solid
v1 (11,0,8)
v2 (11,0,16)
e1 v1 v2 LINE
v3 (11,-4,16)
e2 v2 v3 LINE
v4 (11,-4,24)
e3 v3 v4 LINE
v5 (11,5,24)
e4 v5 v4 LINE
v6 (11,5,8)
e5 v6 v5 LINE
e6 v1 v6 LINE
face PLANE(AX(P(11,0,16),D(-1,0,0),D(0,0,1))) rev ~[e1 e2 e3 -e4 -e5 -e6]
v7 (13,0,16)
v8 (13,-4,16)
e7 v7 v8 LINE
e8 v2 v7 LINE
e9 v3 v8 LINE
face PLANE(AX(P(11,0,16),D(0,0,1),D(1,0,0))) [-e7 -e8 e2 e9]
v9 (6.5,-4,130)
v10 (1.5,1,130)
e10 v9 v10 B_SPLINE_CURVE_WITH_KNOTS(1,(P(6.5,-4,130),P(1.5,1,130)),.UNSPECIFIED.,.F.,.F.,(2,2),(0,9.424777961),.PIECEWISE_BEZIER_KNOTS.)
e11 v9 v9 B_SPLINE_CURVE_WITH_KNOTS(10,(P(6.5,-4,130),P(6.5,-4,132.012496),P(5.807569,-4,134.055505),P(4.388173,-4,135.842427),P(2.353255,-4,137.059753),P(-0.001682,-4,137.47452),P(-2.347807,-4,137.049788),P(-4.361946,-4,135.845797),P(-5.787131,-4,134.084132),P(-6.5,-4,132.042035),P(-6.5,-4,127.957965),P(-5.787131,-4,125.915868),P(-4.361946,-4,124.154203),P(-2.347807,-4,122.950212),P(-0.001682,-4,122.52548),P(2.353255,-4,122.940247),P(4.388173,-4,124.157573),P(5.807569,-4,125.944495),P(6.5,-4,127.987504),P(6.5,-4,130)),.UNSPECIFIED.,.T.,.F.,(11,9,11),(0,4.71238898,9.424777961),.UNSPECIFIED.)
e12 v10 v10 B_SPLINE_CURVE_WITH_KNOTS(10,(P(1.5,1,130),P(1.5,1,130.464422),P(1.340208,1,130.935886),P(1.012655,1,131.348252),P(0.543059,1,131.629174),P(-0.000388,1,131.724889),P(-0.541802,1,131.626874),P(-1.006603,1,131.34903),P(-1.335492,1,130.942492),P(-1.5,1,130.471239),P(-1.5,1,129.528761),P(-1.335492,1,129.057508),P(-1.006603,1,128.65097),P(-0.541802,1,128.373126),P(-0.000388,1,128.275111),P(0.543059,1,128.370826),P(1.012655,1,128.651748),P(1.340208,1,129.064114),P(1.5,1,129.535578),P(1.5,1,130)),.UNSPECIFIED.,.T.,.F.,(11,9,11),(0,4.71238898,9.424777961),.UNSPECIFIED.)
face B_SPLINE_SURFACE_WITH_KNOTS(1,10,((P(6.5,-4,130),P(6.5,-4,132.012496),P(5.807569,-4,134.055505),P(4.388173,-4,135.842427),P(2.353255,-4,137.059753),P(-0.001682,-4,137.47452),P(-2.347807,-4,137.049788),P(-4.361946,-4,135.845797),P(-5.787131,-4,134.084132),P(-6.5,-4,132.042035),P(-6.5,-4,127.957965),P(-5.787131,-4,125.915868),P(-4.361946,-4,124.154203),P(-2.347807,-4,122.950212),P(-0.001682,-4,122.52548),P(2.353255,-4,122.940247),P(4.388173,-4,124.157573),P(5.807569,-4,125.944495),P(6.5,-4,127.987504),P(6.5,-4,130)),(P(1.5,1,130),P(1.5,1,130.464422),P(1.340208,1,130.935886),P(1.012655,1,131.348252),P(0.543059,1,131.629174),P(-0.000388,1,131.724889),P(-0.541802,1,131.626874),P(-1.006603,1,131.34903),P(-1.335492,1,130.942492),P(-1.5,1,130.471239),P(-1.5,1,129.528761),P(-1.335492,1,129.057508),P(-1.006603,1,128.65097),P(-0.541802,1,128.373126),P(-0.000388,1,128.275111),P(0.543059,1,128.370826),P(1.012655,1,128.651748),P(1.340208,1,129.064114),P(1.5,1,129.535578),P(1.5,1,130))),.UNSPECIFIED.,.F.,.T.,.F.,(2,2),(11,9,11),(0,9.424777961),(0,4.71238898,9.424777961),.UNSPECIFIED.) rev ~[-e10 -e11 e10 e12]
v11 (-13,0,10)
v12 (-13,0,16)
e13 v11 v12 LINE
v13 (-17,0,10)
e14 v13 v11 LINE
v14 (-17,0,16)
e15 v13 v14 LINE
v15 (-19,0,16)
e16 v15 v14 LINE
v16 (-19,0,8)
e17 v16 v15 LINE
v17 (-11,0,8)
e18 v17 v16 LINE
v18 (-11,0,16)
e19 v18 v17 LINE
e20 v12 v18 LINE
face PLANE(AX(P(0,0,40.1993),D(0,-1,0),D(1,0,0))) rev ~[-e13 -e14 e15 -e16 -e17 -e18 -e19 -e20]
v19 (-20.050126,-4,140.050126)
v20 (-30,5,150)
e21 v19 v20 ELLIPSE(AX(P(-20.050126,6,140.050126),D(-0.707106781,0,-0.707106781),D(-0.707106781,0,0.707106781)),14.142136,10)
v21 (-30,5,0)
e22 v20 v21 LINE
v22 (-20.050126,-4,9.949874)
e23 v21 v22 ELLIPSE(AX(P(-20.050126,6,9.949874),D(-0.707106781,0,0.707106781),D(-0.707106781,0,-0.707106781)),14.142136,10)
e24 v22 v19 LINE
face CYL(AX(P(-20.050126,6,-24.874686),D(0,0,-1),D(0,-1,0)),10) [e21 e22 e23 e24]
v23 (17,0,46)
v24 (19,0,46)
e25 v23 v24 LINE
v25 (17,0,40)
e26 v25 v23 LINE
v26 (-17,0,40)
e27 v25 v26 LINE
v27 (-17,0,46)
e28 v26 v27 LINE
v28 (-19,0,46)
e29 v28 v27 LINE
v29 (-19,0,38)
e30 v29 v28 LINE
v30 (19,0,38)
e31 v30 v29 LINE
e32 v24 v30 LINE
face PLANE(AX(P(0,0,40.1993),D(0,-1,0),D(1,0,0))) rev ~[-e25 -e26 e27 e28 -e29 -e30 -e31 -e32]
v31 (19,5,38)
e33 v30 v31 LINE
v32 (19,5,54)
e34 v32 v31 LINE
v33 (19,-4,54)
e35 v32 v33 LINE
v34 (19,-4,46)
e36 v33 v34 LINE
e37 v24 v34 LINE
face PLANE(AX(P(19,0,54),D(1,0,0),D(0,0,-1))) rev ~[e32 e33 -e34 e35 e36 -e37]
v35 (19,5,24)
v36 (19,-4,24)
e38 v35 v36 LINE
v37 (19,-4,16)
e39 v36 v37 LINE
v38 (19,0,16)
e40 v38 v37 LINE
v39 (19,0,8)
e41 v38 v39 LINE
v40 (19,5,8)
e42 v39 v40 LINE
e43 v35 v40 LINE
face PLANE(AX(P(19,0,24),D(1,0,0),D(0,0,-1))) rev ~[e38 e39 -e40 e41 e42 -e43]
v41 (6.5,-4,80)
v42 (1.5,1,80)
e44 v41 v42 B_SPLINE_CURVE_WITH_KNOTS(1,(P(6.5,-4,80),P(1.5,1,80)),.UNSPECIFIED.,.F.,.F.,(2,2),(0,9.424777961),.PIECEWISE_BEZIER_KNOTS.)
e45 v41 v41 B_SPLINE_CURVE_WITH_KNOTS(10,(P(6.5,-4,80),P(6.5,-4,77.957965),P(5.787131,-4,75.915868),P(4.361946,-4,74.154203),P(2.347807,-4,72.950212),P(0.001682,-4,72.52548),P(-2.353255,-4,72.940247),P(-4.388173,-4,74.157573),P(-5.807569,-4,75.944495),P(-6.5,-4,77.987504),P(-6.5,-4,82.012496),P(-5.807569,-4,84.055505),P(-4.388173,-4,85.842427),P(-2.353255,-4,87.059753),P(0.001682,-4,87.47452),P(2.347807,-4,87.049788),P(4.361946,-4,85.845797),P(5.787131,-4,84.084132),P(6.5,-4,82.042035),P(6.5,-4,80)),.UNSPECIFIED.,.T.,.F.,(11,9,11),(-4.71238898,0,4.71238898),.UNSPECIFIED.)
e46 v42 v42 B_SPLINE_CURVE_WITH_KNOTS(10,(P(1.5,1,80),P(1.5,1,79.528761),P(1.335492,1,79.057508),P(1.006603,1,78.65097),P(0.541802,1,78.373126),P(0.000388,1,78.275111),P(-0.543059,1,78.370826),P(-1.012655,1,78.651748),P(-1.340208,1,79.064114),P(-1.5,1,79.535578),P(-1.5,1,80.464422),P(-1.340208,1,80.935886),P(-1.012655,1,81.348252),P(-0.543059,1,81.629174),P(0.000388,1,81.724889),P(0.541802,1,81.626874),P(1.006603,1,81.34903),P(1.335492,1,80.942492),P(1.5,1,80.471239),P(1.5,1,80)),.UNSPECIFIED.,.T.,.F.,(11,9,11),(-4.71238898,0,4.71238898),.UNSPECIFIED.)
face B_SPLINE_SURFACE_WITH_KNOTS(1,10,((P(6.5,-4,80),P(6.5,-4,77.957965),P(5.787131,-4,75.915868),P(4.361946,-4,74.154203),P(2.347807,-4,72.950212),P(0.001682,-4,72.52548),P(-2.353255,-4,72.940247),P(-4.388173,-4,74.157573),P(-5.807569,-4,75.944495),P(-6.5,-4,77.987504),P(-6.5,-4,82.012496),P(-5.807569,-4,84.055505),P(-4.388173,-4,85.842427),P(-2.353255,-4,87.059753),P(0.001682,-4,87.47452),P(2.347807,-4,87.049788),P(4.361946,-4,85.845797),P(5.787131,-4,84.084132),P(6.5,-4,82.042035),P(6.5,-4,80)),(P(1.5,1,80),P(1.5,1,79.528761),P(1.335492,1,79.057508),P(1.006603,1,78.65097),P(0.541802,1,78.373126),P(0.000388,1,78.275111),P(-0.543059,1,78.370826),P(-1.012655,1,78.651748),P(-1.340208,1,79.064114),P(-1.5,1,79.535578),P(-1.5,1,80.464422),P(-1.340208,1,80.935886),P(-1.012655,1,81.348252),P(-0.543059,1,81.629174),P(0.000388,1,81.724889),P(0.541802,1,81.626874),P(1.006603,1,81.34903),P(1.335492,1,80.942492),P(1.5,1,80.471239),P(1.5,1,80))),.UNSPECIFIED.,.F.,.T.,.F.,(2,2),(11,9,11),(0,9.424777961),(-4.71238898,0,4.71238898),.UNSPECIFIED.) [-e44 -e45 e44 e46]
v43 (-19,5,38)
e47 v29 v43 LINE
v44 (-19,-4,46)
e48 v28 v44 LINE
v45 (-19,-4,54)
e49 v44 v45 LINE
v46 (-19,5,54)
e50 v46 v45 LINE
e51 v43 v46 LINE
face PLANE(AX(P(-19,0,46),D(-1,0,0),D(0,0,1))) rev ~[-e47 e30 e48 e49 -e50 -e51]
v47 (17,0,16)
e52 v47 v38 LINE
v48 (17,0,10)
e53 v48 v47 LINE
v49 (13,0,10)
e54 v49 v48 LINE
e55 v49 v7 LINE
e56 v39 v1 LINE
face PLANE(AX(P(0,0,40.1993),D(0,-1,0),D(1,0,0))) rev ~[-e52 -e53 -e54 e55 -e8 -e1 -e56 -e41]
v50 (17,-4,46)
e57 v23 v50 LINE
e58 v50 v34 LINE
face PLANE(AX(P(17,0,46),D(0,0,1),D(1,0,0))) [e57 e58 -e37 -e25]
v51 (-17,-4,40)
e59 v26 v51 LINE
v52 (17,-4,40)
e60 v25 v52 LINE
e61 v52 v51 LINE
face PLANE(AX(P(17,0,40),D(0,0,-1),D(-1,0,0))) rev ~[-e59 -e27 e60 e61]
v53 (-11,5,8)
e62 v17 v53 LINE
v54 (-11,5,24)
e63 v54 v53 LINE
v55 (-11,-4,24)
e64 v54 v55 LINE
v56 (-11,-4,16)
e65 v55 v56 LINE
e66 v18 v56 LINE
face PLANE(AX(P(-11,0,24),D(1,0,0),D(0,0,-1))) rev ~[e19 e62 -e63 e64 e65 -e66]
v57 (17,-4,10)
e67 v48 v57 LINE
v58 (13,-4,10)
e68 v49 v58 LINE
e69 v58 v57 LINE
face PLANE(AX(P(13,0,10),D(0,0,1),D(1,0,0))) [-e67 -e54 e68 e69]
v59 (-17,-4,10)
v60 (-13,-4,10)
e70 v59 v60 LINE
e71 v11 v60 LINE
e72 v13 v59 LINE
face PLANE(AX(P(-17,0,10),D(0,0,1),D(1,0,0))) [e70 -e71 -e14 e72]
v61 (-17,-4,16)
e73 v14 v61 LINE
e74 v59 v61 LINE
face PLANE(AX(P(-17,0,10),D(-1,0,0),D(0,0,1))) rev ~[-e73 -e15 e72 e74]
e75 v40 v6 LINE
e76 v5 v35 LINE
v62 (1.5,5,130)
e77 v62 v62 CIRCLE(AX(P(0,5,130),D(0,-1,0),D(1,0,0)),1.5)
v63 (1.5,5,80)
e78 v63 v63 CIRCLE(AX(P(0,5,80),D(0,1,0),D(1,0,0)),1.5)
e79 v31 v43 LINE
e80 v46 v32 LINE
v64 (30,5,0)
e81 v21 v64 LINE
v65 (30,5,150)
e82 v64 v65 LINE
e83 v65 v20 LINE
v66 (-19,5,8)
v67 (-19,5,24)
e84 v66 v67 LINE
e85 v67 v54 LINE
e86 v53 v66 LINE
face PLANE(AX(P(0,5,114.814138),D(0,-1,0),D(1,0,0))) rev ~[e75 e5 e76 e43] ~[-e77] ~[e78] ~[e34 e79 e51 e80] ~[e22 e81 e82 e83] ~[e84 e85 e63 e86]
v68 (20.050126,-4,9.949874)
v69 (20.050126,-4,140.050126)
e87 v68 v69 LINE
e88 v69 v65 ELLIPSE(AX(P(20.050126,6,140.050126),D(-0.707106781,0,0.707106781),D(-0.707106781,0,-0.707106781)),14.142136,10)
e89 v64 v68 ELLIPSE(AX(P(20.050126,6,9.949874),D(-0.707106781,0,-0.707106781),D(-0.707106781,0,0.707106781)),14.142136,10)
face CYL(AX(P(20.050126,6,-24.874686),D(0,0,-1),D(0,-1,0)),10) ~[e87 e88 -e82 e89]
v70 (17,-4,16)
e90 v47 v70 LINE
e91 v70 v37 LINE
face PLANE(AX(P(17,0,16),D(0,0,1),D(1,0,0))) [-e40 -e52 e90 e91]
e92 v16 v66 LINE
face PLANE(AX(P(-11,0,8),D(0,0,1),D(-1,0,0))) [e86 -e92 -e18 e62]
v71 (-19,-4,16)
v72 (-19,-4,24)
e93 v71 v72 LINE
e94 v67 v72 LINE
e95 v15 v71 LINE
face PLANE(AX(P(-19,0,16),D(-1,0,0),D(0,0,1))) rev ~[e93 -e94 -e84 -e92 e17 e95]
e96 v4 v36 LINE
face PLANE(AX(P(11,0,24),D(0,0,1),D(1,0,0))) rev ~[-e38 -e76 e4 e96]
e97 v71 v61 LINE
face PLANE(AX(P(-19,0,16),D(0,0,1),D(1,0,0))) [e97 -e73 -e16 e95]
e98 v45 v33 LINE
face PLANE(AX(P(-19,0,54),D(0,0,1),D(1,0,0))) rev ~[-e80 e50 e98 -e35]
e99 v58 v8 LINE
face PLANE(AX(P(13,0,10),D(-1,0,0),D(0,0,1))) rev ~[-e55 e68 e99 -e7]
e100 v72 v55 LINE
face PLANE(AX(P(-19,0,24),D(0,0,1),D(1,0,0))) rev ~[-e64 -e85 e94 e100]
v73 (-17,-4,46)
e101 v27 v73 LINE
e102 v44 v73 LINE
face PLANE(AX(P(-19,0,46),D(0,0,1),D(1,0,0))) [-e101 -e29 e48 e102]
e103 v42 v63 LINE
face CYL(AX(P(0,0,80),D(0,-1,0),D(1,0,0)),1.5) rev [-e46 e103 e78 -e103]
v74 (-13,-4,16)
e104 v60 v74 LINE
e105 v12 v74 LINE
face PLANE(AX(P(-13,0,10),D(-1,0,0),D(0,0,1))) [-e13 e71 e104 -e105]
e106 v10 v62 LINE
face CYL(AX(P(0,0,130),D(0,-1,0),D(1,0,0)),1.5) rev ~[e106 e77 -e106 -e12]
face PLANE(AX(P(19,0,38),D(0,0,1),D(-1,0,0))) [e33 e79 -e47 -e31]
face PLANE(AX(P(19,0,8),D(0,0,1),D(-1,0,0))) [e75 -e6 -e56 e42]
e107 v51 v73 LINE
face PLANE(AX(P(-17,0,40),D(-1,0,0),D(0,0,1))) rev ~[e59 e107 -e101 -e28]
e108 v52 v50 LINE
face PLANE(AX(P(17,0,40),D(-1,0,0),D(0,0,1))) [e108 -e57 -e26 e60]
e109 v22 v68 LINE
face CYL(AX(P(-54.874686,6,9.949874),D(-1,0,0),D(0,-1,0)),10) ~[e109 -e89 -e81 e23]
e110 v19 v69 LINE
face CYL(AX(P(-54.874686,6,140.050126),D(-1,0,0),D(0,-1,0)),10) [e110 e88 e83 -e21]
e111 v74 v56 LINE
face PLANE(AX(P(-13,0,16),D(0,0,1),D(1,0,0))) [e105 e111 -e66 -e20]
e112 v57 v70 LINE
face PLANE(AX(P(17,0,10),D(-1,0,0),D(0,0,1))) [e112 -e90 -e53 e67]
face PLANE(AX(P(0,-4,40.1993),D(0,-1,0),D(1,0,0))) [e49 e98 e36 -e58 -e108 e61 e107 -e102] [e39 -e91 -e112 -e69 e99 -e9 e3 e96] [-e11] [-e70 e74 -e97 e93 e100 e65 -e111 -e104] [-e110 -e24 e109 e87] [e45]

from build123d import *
from build123d import SkipClean  # not in build123d's __all__

# Parameters (mm, degrees)
F0_R        = 1.5
F1_DEPTH    = 5
F0_W        = 22
F0_H        = 2
F0_W_2      = 2
F0_H_2      = 6
F0_W_3      = 4
F2_DEPTH    = 4
F3_SIZE     = 5
F4_T1_DEPTH = 109.7493718553
F4_T3_DEPTH = 199.7493718553


# Not quite as in the source:
# - a fillet or chamfer that OpenCascade refuses, or shapes differently, is made with other operations: its cross-section is extruded or revolved along the edge and cut away or added
# - a feature names something its author has since deleted; it is built from what else it names


with BuildPart() as f1:
    # F0 (on Front) → F1 (new body)
    with BuildSketch(Plane.XZ):
        with BuildLine():
            Line((-30, 150), (-30, 80))
            Line((-30, 80), (-1.5, 80))
            ThreePointArc((-1.5, 80), (0, 81.5), (1.5, 80))
            Line((1.5, 80), (30, 80))
            Line((30, 80), (30, 150))
            Line((30, 150), (-30, 150))
        make_face()
        with Locations((0, 130)):
            Circle(F0_R, mode=Mode.SUBTRACT)
        with BuildLine():
            Line((-30, 0), (0, 0))
            Line((0, 0), (30, 0))
            Line((30, 0), (30, 80))
            Line((30, 80), (1.5, 80))
            ThreePointArc((1.5, 80), (0, 78.5), (-1.5, 80))
            Line((-1.5, 80), (-30, 80))
            Line((-30, 80), (-30, 0))
        make_face()
        Polygon((-11, 24), (-11, 16), (-11, 10), (-11, 8), (-13, 8), (-17, 8), (-19, 8), (-19, 10), (-19, 16), (-19, 24), align=None, mode=Mode.SUBTRACT)
        Polygon((19, 24), (19, 16), (19, 10), (19, 8), (17, 8), (13, 8), (11, 8), (11, 10), (11, 16), (11, 24), align=None, mode=Mode.SUBTRACT)
        Polygon((-19, 54), (-11, 54), (11, 54), (19, 54), (19, 46), (19, 40), (19, 38), (17, 38), (13, 38), (11, 38), (-11, 38), (-13, 38), (-17, 38), (-19, 38), (-19, 40), (-19, 46), (-19, 48), align=None, mode=Mode.SUBTRACT)
    extrude(amount=-F1_DEPTH)

    # F0 (on Front) → F2 (join)
    with BuildSketch(Plane.XZ):
        with BuildLine():
            Line((-30, 0), (0, 0))
            Line((0, 0), (30, 0))
            Line((30, 0), (30, 80))
            Line((30, 80), (1.5, 80))
            ThreePointArc((1.5, 80), (0, 78.5), (-1.5, 80))
            Line((-1.5, 80), (-30, 80))
            Line((-30, 80), (-30, 0))
        make_face()
        Polygon((-11, 24), (-11, 16), (-11, 10), (-11, 8), (-13, 8), (-17, 8), (-19, 8), (-19, 10), (-19, 16), (-19, 24), align=None, mode=Mode.SUBTRACT)
        Polygon((19, 24), (19, 16), (19, 10), (19, 8), (17, 8), (13, 8), (11, 8), (11, 10), (11, 16), (11, 24), align=None, mode=Mode.SUBTRACT)
        Polygon((-19, 54), (-11, 54), (11, 54), (19, 54), (19, 46), (19, 40), (19, 38), (17, 38), (13, 38), (11, 38), (-11, 38), (-13, 38), (-17, 38), (-19, 38), (-19, 40), (-19, 46), (-19, 48), align=None, mode=Mode.SUBTRACT)
        with BuildLine():
            Line((-30, 150), (-30, 80))
            Line((-30, 80), (-1.5, 80))
            ThreePointArc((-1.5, 80), (0, 81.5), (1.5, 80))
            Line((1.5, 80), (30, 80))
            Line((30, 80), (30, 150))
            Line((30, 150), (-30, 150))
        make_face()
        with Locations((0, 130)):
            Circle(F0_R, mode=Mode.SUBTRACT)
        with Locations((0, 39)):
            Rectangle(F0_W, F0_H)
        with Locations((-18, 43)):
            Rectangle(F0_W_2, F0_H_2)
        with Locations((18, 43)):
            Rectangle(F0_W_2, F0_H_2)
        with Locations((-18, 13)):
            Rectangle(F0_W_2, F0_H_2)
        with Locations((-12, 13)):
            Rectangle(F0_W_2, F0_H_2)
        with Locations((12, 13)):
            Rectangle(F0_W_2, F0_H_2)
        with Locations((18, 13)):
            Rectangle(F0_W_2, F0_H_2)
        with Locations((-15, 39)):
            Rectangle(F0_W_3, F0_H)
        with Locations((15, 39)):
            Rectangle(F0_W_3, F0_H)
        with Locations((-15, 9)):
            Rectangle(F0_W_3, F0_H)
        with Locations((15, 9)):
            Rectangle(F0_W_3, F0_H)
        with Locations((-18, 39)):
            Rectangle(F0_W_2, F0_H)
        with Locations((-12, 39)):
            Rectangle(F0_W_2, F0_H)
        with Locations((12, 39)):
            Rectangle(F0_W_2, F0_H)
        with Locations((18, 39)):
            Rectangle(F0_W_2, F0_H)
        with Locations((-18, 9)):
            Rectangle(F0_W_2, F0_H)
        with Locations((-12, 9)):
            Rectangle(F0_W_2, F0_H)
        with Locations((12, 9)):
            Rectangle(F0_W_2, F0_H)
        with Locations((18, 9)):
            Rectangle(F0_W_2, F0_H)
    with SkipClean():  # cleaning this boolean's faces spoils the solid; the shape is the same uncleaned
        extrude(amount=F2_DEPTH)

    # F3
    f3_edges = [f1.edges().sort_by_distance(p)[0] for p in [
        (-1.5, -4, 130),
        (1.5, -4, 80),
    ]]
    chamfer(f3_edges, length=F3_SIZE)

    # F4: fillet of radius 10 on 4 edges, made by hand

    # F4_s2 → F4_t1 (cut)
    with BuildSketch(Plane.YZ.offset(-54.8746859277)):
        with BuildLine():
            ThreePointArc((-4, 9.9498743711), (-1.4161984871, 3.2416704386), (5, 0))
            Line((5, 0), (-4, 0))
            Line((-4, 0), (-4, 9.9498743711))
        make_face()
        with BuildLine():
            ThreePointArc((-4, 140.0501256289), (-1.4161984871, 146.7583295614), (5, 150))
            Line((5, 150), (-4, 150))
            Line((-4, 150), (-4, 140.0501256289))
        make_face()
    extrude(amount=F4_T1_DEPTH, mode=Mode.SUBTRACT)

    # F4_s4 → F4_t3 (cut)
    with BuildSketch(Plane.XY.offset(-24.8746859277)):
        with BuildLine():
            ThreePointArc((-20.0501256289, -4), (-26.7583295614, -1.4161984871), (-30, 5))
            Line((-30, 5), (-30, -4))
            Line((-30, -4), (-20.0501256289, -4))
        make_face()
        with BuildLine():
            ThreePointArc((20.0501256289, -4), (26.7583295614, -1.4161984871), (30, 5))
            Line((30, 5), (30, -4))
            Line((30, -4), (20.0501256289, -4))
        make_face()
    extrude(amount=F4_T3_DEPTH, mode=Mode.SUBTRACT)


solid = f1.part
